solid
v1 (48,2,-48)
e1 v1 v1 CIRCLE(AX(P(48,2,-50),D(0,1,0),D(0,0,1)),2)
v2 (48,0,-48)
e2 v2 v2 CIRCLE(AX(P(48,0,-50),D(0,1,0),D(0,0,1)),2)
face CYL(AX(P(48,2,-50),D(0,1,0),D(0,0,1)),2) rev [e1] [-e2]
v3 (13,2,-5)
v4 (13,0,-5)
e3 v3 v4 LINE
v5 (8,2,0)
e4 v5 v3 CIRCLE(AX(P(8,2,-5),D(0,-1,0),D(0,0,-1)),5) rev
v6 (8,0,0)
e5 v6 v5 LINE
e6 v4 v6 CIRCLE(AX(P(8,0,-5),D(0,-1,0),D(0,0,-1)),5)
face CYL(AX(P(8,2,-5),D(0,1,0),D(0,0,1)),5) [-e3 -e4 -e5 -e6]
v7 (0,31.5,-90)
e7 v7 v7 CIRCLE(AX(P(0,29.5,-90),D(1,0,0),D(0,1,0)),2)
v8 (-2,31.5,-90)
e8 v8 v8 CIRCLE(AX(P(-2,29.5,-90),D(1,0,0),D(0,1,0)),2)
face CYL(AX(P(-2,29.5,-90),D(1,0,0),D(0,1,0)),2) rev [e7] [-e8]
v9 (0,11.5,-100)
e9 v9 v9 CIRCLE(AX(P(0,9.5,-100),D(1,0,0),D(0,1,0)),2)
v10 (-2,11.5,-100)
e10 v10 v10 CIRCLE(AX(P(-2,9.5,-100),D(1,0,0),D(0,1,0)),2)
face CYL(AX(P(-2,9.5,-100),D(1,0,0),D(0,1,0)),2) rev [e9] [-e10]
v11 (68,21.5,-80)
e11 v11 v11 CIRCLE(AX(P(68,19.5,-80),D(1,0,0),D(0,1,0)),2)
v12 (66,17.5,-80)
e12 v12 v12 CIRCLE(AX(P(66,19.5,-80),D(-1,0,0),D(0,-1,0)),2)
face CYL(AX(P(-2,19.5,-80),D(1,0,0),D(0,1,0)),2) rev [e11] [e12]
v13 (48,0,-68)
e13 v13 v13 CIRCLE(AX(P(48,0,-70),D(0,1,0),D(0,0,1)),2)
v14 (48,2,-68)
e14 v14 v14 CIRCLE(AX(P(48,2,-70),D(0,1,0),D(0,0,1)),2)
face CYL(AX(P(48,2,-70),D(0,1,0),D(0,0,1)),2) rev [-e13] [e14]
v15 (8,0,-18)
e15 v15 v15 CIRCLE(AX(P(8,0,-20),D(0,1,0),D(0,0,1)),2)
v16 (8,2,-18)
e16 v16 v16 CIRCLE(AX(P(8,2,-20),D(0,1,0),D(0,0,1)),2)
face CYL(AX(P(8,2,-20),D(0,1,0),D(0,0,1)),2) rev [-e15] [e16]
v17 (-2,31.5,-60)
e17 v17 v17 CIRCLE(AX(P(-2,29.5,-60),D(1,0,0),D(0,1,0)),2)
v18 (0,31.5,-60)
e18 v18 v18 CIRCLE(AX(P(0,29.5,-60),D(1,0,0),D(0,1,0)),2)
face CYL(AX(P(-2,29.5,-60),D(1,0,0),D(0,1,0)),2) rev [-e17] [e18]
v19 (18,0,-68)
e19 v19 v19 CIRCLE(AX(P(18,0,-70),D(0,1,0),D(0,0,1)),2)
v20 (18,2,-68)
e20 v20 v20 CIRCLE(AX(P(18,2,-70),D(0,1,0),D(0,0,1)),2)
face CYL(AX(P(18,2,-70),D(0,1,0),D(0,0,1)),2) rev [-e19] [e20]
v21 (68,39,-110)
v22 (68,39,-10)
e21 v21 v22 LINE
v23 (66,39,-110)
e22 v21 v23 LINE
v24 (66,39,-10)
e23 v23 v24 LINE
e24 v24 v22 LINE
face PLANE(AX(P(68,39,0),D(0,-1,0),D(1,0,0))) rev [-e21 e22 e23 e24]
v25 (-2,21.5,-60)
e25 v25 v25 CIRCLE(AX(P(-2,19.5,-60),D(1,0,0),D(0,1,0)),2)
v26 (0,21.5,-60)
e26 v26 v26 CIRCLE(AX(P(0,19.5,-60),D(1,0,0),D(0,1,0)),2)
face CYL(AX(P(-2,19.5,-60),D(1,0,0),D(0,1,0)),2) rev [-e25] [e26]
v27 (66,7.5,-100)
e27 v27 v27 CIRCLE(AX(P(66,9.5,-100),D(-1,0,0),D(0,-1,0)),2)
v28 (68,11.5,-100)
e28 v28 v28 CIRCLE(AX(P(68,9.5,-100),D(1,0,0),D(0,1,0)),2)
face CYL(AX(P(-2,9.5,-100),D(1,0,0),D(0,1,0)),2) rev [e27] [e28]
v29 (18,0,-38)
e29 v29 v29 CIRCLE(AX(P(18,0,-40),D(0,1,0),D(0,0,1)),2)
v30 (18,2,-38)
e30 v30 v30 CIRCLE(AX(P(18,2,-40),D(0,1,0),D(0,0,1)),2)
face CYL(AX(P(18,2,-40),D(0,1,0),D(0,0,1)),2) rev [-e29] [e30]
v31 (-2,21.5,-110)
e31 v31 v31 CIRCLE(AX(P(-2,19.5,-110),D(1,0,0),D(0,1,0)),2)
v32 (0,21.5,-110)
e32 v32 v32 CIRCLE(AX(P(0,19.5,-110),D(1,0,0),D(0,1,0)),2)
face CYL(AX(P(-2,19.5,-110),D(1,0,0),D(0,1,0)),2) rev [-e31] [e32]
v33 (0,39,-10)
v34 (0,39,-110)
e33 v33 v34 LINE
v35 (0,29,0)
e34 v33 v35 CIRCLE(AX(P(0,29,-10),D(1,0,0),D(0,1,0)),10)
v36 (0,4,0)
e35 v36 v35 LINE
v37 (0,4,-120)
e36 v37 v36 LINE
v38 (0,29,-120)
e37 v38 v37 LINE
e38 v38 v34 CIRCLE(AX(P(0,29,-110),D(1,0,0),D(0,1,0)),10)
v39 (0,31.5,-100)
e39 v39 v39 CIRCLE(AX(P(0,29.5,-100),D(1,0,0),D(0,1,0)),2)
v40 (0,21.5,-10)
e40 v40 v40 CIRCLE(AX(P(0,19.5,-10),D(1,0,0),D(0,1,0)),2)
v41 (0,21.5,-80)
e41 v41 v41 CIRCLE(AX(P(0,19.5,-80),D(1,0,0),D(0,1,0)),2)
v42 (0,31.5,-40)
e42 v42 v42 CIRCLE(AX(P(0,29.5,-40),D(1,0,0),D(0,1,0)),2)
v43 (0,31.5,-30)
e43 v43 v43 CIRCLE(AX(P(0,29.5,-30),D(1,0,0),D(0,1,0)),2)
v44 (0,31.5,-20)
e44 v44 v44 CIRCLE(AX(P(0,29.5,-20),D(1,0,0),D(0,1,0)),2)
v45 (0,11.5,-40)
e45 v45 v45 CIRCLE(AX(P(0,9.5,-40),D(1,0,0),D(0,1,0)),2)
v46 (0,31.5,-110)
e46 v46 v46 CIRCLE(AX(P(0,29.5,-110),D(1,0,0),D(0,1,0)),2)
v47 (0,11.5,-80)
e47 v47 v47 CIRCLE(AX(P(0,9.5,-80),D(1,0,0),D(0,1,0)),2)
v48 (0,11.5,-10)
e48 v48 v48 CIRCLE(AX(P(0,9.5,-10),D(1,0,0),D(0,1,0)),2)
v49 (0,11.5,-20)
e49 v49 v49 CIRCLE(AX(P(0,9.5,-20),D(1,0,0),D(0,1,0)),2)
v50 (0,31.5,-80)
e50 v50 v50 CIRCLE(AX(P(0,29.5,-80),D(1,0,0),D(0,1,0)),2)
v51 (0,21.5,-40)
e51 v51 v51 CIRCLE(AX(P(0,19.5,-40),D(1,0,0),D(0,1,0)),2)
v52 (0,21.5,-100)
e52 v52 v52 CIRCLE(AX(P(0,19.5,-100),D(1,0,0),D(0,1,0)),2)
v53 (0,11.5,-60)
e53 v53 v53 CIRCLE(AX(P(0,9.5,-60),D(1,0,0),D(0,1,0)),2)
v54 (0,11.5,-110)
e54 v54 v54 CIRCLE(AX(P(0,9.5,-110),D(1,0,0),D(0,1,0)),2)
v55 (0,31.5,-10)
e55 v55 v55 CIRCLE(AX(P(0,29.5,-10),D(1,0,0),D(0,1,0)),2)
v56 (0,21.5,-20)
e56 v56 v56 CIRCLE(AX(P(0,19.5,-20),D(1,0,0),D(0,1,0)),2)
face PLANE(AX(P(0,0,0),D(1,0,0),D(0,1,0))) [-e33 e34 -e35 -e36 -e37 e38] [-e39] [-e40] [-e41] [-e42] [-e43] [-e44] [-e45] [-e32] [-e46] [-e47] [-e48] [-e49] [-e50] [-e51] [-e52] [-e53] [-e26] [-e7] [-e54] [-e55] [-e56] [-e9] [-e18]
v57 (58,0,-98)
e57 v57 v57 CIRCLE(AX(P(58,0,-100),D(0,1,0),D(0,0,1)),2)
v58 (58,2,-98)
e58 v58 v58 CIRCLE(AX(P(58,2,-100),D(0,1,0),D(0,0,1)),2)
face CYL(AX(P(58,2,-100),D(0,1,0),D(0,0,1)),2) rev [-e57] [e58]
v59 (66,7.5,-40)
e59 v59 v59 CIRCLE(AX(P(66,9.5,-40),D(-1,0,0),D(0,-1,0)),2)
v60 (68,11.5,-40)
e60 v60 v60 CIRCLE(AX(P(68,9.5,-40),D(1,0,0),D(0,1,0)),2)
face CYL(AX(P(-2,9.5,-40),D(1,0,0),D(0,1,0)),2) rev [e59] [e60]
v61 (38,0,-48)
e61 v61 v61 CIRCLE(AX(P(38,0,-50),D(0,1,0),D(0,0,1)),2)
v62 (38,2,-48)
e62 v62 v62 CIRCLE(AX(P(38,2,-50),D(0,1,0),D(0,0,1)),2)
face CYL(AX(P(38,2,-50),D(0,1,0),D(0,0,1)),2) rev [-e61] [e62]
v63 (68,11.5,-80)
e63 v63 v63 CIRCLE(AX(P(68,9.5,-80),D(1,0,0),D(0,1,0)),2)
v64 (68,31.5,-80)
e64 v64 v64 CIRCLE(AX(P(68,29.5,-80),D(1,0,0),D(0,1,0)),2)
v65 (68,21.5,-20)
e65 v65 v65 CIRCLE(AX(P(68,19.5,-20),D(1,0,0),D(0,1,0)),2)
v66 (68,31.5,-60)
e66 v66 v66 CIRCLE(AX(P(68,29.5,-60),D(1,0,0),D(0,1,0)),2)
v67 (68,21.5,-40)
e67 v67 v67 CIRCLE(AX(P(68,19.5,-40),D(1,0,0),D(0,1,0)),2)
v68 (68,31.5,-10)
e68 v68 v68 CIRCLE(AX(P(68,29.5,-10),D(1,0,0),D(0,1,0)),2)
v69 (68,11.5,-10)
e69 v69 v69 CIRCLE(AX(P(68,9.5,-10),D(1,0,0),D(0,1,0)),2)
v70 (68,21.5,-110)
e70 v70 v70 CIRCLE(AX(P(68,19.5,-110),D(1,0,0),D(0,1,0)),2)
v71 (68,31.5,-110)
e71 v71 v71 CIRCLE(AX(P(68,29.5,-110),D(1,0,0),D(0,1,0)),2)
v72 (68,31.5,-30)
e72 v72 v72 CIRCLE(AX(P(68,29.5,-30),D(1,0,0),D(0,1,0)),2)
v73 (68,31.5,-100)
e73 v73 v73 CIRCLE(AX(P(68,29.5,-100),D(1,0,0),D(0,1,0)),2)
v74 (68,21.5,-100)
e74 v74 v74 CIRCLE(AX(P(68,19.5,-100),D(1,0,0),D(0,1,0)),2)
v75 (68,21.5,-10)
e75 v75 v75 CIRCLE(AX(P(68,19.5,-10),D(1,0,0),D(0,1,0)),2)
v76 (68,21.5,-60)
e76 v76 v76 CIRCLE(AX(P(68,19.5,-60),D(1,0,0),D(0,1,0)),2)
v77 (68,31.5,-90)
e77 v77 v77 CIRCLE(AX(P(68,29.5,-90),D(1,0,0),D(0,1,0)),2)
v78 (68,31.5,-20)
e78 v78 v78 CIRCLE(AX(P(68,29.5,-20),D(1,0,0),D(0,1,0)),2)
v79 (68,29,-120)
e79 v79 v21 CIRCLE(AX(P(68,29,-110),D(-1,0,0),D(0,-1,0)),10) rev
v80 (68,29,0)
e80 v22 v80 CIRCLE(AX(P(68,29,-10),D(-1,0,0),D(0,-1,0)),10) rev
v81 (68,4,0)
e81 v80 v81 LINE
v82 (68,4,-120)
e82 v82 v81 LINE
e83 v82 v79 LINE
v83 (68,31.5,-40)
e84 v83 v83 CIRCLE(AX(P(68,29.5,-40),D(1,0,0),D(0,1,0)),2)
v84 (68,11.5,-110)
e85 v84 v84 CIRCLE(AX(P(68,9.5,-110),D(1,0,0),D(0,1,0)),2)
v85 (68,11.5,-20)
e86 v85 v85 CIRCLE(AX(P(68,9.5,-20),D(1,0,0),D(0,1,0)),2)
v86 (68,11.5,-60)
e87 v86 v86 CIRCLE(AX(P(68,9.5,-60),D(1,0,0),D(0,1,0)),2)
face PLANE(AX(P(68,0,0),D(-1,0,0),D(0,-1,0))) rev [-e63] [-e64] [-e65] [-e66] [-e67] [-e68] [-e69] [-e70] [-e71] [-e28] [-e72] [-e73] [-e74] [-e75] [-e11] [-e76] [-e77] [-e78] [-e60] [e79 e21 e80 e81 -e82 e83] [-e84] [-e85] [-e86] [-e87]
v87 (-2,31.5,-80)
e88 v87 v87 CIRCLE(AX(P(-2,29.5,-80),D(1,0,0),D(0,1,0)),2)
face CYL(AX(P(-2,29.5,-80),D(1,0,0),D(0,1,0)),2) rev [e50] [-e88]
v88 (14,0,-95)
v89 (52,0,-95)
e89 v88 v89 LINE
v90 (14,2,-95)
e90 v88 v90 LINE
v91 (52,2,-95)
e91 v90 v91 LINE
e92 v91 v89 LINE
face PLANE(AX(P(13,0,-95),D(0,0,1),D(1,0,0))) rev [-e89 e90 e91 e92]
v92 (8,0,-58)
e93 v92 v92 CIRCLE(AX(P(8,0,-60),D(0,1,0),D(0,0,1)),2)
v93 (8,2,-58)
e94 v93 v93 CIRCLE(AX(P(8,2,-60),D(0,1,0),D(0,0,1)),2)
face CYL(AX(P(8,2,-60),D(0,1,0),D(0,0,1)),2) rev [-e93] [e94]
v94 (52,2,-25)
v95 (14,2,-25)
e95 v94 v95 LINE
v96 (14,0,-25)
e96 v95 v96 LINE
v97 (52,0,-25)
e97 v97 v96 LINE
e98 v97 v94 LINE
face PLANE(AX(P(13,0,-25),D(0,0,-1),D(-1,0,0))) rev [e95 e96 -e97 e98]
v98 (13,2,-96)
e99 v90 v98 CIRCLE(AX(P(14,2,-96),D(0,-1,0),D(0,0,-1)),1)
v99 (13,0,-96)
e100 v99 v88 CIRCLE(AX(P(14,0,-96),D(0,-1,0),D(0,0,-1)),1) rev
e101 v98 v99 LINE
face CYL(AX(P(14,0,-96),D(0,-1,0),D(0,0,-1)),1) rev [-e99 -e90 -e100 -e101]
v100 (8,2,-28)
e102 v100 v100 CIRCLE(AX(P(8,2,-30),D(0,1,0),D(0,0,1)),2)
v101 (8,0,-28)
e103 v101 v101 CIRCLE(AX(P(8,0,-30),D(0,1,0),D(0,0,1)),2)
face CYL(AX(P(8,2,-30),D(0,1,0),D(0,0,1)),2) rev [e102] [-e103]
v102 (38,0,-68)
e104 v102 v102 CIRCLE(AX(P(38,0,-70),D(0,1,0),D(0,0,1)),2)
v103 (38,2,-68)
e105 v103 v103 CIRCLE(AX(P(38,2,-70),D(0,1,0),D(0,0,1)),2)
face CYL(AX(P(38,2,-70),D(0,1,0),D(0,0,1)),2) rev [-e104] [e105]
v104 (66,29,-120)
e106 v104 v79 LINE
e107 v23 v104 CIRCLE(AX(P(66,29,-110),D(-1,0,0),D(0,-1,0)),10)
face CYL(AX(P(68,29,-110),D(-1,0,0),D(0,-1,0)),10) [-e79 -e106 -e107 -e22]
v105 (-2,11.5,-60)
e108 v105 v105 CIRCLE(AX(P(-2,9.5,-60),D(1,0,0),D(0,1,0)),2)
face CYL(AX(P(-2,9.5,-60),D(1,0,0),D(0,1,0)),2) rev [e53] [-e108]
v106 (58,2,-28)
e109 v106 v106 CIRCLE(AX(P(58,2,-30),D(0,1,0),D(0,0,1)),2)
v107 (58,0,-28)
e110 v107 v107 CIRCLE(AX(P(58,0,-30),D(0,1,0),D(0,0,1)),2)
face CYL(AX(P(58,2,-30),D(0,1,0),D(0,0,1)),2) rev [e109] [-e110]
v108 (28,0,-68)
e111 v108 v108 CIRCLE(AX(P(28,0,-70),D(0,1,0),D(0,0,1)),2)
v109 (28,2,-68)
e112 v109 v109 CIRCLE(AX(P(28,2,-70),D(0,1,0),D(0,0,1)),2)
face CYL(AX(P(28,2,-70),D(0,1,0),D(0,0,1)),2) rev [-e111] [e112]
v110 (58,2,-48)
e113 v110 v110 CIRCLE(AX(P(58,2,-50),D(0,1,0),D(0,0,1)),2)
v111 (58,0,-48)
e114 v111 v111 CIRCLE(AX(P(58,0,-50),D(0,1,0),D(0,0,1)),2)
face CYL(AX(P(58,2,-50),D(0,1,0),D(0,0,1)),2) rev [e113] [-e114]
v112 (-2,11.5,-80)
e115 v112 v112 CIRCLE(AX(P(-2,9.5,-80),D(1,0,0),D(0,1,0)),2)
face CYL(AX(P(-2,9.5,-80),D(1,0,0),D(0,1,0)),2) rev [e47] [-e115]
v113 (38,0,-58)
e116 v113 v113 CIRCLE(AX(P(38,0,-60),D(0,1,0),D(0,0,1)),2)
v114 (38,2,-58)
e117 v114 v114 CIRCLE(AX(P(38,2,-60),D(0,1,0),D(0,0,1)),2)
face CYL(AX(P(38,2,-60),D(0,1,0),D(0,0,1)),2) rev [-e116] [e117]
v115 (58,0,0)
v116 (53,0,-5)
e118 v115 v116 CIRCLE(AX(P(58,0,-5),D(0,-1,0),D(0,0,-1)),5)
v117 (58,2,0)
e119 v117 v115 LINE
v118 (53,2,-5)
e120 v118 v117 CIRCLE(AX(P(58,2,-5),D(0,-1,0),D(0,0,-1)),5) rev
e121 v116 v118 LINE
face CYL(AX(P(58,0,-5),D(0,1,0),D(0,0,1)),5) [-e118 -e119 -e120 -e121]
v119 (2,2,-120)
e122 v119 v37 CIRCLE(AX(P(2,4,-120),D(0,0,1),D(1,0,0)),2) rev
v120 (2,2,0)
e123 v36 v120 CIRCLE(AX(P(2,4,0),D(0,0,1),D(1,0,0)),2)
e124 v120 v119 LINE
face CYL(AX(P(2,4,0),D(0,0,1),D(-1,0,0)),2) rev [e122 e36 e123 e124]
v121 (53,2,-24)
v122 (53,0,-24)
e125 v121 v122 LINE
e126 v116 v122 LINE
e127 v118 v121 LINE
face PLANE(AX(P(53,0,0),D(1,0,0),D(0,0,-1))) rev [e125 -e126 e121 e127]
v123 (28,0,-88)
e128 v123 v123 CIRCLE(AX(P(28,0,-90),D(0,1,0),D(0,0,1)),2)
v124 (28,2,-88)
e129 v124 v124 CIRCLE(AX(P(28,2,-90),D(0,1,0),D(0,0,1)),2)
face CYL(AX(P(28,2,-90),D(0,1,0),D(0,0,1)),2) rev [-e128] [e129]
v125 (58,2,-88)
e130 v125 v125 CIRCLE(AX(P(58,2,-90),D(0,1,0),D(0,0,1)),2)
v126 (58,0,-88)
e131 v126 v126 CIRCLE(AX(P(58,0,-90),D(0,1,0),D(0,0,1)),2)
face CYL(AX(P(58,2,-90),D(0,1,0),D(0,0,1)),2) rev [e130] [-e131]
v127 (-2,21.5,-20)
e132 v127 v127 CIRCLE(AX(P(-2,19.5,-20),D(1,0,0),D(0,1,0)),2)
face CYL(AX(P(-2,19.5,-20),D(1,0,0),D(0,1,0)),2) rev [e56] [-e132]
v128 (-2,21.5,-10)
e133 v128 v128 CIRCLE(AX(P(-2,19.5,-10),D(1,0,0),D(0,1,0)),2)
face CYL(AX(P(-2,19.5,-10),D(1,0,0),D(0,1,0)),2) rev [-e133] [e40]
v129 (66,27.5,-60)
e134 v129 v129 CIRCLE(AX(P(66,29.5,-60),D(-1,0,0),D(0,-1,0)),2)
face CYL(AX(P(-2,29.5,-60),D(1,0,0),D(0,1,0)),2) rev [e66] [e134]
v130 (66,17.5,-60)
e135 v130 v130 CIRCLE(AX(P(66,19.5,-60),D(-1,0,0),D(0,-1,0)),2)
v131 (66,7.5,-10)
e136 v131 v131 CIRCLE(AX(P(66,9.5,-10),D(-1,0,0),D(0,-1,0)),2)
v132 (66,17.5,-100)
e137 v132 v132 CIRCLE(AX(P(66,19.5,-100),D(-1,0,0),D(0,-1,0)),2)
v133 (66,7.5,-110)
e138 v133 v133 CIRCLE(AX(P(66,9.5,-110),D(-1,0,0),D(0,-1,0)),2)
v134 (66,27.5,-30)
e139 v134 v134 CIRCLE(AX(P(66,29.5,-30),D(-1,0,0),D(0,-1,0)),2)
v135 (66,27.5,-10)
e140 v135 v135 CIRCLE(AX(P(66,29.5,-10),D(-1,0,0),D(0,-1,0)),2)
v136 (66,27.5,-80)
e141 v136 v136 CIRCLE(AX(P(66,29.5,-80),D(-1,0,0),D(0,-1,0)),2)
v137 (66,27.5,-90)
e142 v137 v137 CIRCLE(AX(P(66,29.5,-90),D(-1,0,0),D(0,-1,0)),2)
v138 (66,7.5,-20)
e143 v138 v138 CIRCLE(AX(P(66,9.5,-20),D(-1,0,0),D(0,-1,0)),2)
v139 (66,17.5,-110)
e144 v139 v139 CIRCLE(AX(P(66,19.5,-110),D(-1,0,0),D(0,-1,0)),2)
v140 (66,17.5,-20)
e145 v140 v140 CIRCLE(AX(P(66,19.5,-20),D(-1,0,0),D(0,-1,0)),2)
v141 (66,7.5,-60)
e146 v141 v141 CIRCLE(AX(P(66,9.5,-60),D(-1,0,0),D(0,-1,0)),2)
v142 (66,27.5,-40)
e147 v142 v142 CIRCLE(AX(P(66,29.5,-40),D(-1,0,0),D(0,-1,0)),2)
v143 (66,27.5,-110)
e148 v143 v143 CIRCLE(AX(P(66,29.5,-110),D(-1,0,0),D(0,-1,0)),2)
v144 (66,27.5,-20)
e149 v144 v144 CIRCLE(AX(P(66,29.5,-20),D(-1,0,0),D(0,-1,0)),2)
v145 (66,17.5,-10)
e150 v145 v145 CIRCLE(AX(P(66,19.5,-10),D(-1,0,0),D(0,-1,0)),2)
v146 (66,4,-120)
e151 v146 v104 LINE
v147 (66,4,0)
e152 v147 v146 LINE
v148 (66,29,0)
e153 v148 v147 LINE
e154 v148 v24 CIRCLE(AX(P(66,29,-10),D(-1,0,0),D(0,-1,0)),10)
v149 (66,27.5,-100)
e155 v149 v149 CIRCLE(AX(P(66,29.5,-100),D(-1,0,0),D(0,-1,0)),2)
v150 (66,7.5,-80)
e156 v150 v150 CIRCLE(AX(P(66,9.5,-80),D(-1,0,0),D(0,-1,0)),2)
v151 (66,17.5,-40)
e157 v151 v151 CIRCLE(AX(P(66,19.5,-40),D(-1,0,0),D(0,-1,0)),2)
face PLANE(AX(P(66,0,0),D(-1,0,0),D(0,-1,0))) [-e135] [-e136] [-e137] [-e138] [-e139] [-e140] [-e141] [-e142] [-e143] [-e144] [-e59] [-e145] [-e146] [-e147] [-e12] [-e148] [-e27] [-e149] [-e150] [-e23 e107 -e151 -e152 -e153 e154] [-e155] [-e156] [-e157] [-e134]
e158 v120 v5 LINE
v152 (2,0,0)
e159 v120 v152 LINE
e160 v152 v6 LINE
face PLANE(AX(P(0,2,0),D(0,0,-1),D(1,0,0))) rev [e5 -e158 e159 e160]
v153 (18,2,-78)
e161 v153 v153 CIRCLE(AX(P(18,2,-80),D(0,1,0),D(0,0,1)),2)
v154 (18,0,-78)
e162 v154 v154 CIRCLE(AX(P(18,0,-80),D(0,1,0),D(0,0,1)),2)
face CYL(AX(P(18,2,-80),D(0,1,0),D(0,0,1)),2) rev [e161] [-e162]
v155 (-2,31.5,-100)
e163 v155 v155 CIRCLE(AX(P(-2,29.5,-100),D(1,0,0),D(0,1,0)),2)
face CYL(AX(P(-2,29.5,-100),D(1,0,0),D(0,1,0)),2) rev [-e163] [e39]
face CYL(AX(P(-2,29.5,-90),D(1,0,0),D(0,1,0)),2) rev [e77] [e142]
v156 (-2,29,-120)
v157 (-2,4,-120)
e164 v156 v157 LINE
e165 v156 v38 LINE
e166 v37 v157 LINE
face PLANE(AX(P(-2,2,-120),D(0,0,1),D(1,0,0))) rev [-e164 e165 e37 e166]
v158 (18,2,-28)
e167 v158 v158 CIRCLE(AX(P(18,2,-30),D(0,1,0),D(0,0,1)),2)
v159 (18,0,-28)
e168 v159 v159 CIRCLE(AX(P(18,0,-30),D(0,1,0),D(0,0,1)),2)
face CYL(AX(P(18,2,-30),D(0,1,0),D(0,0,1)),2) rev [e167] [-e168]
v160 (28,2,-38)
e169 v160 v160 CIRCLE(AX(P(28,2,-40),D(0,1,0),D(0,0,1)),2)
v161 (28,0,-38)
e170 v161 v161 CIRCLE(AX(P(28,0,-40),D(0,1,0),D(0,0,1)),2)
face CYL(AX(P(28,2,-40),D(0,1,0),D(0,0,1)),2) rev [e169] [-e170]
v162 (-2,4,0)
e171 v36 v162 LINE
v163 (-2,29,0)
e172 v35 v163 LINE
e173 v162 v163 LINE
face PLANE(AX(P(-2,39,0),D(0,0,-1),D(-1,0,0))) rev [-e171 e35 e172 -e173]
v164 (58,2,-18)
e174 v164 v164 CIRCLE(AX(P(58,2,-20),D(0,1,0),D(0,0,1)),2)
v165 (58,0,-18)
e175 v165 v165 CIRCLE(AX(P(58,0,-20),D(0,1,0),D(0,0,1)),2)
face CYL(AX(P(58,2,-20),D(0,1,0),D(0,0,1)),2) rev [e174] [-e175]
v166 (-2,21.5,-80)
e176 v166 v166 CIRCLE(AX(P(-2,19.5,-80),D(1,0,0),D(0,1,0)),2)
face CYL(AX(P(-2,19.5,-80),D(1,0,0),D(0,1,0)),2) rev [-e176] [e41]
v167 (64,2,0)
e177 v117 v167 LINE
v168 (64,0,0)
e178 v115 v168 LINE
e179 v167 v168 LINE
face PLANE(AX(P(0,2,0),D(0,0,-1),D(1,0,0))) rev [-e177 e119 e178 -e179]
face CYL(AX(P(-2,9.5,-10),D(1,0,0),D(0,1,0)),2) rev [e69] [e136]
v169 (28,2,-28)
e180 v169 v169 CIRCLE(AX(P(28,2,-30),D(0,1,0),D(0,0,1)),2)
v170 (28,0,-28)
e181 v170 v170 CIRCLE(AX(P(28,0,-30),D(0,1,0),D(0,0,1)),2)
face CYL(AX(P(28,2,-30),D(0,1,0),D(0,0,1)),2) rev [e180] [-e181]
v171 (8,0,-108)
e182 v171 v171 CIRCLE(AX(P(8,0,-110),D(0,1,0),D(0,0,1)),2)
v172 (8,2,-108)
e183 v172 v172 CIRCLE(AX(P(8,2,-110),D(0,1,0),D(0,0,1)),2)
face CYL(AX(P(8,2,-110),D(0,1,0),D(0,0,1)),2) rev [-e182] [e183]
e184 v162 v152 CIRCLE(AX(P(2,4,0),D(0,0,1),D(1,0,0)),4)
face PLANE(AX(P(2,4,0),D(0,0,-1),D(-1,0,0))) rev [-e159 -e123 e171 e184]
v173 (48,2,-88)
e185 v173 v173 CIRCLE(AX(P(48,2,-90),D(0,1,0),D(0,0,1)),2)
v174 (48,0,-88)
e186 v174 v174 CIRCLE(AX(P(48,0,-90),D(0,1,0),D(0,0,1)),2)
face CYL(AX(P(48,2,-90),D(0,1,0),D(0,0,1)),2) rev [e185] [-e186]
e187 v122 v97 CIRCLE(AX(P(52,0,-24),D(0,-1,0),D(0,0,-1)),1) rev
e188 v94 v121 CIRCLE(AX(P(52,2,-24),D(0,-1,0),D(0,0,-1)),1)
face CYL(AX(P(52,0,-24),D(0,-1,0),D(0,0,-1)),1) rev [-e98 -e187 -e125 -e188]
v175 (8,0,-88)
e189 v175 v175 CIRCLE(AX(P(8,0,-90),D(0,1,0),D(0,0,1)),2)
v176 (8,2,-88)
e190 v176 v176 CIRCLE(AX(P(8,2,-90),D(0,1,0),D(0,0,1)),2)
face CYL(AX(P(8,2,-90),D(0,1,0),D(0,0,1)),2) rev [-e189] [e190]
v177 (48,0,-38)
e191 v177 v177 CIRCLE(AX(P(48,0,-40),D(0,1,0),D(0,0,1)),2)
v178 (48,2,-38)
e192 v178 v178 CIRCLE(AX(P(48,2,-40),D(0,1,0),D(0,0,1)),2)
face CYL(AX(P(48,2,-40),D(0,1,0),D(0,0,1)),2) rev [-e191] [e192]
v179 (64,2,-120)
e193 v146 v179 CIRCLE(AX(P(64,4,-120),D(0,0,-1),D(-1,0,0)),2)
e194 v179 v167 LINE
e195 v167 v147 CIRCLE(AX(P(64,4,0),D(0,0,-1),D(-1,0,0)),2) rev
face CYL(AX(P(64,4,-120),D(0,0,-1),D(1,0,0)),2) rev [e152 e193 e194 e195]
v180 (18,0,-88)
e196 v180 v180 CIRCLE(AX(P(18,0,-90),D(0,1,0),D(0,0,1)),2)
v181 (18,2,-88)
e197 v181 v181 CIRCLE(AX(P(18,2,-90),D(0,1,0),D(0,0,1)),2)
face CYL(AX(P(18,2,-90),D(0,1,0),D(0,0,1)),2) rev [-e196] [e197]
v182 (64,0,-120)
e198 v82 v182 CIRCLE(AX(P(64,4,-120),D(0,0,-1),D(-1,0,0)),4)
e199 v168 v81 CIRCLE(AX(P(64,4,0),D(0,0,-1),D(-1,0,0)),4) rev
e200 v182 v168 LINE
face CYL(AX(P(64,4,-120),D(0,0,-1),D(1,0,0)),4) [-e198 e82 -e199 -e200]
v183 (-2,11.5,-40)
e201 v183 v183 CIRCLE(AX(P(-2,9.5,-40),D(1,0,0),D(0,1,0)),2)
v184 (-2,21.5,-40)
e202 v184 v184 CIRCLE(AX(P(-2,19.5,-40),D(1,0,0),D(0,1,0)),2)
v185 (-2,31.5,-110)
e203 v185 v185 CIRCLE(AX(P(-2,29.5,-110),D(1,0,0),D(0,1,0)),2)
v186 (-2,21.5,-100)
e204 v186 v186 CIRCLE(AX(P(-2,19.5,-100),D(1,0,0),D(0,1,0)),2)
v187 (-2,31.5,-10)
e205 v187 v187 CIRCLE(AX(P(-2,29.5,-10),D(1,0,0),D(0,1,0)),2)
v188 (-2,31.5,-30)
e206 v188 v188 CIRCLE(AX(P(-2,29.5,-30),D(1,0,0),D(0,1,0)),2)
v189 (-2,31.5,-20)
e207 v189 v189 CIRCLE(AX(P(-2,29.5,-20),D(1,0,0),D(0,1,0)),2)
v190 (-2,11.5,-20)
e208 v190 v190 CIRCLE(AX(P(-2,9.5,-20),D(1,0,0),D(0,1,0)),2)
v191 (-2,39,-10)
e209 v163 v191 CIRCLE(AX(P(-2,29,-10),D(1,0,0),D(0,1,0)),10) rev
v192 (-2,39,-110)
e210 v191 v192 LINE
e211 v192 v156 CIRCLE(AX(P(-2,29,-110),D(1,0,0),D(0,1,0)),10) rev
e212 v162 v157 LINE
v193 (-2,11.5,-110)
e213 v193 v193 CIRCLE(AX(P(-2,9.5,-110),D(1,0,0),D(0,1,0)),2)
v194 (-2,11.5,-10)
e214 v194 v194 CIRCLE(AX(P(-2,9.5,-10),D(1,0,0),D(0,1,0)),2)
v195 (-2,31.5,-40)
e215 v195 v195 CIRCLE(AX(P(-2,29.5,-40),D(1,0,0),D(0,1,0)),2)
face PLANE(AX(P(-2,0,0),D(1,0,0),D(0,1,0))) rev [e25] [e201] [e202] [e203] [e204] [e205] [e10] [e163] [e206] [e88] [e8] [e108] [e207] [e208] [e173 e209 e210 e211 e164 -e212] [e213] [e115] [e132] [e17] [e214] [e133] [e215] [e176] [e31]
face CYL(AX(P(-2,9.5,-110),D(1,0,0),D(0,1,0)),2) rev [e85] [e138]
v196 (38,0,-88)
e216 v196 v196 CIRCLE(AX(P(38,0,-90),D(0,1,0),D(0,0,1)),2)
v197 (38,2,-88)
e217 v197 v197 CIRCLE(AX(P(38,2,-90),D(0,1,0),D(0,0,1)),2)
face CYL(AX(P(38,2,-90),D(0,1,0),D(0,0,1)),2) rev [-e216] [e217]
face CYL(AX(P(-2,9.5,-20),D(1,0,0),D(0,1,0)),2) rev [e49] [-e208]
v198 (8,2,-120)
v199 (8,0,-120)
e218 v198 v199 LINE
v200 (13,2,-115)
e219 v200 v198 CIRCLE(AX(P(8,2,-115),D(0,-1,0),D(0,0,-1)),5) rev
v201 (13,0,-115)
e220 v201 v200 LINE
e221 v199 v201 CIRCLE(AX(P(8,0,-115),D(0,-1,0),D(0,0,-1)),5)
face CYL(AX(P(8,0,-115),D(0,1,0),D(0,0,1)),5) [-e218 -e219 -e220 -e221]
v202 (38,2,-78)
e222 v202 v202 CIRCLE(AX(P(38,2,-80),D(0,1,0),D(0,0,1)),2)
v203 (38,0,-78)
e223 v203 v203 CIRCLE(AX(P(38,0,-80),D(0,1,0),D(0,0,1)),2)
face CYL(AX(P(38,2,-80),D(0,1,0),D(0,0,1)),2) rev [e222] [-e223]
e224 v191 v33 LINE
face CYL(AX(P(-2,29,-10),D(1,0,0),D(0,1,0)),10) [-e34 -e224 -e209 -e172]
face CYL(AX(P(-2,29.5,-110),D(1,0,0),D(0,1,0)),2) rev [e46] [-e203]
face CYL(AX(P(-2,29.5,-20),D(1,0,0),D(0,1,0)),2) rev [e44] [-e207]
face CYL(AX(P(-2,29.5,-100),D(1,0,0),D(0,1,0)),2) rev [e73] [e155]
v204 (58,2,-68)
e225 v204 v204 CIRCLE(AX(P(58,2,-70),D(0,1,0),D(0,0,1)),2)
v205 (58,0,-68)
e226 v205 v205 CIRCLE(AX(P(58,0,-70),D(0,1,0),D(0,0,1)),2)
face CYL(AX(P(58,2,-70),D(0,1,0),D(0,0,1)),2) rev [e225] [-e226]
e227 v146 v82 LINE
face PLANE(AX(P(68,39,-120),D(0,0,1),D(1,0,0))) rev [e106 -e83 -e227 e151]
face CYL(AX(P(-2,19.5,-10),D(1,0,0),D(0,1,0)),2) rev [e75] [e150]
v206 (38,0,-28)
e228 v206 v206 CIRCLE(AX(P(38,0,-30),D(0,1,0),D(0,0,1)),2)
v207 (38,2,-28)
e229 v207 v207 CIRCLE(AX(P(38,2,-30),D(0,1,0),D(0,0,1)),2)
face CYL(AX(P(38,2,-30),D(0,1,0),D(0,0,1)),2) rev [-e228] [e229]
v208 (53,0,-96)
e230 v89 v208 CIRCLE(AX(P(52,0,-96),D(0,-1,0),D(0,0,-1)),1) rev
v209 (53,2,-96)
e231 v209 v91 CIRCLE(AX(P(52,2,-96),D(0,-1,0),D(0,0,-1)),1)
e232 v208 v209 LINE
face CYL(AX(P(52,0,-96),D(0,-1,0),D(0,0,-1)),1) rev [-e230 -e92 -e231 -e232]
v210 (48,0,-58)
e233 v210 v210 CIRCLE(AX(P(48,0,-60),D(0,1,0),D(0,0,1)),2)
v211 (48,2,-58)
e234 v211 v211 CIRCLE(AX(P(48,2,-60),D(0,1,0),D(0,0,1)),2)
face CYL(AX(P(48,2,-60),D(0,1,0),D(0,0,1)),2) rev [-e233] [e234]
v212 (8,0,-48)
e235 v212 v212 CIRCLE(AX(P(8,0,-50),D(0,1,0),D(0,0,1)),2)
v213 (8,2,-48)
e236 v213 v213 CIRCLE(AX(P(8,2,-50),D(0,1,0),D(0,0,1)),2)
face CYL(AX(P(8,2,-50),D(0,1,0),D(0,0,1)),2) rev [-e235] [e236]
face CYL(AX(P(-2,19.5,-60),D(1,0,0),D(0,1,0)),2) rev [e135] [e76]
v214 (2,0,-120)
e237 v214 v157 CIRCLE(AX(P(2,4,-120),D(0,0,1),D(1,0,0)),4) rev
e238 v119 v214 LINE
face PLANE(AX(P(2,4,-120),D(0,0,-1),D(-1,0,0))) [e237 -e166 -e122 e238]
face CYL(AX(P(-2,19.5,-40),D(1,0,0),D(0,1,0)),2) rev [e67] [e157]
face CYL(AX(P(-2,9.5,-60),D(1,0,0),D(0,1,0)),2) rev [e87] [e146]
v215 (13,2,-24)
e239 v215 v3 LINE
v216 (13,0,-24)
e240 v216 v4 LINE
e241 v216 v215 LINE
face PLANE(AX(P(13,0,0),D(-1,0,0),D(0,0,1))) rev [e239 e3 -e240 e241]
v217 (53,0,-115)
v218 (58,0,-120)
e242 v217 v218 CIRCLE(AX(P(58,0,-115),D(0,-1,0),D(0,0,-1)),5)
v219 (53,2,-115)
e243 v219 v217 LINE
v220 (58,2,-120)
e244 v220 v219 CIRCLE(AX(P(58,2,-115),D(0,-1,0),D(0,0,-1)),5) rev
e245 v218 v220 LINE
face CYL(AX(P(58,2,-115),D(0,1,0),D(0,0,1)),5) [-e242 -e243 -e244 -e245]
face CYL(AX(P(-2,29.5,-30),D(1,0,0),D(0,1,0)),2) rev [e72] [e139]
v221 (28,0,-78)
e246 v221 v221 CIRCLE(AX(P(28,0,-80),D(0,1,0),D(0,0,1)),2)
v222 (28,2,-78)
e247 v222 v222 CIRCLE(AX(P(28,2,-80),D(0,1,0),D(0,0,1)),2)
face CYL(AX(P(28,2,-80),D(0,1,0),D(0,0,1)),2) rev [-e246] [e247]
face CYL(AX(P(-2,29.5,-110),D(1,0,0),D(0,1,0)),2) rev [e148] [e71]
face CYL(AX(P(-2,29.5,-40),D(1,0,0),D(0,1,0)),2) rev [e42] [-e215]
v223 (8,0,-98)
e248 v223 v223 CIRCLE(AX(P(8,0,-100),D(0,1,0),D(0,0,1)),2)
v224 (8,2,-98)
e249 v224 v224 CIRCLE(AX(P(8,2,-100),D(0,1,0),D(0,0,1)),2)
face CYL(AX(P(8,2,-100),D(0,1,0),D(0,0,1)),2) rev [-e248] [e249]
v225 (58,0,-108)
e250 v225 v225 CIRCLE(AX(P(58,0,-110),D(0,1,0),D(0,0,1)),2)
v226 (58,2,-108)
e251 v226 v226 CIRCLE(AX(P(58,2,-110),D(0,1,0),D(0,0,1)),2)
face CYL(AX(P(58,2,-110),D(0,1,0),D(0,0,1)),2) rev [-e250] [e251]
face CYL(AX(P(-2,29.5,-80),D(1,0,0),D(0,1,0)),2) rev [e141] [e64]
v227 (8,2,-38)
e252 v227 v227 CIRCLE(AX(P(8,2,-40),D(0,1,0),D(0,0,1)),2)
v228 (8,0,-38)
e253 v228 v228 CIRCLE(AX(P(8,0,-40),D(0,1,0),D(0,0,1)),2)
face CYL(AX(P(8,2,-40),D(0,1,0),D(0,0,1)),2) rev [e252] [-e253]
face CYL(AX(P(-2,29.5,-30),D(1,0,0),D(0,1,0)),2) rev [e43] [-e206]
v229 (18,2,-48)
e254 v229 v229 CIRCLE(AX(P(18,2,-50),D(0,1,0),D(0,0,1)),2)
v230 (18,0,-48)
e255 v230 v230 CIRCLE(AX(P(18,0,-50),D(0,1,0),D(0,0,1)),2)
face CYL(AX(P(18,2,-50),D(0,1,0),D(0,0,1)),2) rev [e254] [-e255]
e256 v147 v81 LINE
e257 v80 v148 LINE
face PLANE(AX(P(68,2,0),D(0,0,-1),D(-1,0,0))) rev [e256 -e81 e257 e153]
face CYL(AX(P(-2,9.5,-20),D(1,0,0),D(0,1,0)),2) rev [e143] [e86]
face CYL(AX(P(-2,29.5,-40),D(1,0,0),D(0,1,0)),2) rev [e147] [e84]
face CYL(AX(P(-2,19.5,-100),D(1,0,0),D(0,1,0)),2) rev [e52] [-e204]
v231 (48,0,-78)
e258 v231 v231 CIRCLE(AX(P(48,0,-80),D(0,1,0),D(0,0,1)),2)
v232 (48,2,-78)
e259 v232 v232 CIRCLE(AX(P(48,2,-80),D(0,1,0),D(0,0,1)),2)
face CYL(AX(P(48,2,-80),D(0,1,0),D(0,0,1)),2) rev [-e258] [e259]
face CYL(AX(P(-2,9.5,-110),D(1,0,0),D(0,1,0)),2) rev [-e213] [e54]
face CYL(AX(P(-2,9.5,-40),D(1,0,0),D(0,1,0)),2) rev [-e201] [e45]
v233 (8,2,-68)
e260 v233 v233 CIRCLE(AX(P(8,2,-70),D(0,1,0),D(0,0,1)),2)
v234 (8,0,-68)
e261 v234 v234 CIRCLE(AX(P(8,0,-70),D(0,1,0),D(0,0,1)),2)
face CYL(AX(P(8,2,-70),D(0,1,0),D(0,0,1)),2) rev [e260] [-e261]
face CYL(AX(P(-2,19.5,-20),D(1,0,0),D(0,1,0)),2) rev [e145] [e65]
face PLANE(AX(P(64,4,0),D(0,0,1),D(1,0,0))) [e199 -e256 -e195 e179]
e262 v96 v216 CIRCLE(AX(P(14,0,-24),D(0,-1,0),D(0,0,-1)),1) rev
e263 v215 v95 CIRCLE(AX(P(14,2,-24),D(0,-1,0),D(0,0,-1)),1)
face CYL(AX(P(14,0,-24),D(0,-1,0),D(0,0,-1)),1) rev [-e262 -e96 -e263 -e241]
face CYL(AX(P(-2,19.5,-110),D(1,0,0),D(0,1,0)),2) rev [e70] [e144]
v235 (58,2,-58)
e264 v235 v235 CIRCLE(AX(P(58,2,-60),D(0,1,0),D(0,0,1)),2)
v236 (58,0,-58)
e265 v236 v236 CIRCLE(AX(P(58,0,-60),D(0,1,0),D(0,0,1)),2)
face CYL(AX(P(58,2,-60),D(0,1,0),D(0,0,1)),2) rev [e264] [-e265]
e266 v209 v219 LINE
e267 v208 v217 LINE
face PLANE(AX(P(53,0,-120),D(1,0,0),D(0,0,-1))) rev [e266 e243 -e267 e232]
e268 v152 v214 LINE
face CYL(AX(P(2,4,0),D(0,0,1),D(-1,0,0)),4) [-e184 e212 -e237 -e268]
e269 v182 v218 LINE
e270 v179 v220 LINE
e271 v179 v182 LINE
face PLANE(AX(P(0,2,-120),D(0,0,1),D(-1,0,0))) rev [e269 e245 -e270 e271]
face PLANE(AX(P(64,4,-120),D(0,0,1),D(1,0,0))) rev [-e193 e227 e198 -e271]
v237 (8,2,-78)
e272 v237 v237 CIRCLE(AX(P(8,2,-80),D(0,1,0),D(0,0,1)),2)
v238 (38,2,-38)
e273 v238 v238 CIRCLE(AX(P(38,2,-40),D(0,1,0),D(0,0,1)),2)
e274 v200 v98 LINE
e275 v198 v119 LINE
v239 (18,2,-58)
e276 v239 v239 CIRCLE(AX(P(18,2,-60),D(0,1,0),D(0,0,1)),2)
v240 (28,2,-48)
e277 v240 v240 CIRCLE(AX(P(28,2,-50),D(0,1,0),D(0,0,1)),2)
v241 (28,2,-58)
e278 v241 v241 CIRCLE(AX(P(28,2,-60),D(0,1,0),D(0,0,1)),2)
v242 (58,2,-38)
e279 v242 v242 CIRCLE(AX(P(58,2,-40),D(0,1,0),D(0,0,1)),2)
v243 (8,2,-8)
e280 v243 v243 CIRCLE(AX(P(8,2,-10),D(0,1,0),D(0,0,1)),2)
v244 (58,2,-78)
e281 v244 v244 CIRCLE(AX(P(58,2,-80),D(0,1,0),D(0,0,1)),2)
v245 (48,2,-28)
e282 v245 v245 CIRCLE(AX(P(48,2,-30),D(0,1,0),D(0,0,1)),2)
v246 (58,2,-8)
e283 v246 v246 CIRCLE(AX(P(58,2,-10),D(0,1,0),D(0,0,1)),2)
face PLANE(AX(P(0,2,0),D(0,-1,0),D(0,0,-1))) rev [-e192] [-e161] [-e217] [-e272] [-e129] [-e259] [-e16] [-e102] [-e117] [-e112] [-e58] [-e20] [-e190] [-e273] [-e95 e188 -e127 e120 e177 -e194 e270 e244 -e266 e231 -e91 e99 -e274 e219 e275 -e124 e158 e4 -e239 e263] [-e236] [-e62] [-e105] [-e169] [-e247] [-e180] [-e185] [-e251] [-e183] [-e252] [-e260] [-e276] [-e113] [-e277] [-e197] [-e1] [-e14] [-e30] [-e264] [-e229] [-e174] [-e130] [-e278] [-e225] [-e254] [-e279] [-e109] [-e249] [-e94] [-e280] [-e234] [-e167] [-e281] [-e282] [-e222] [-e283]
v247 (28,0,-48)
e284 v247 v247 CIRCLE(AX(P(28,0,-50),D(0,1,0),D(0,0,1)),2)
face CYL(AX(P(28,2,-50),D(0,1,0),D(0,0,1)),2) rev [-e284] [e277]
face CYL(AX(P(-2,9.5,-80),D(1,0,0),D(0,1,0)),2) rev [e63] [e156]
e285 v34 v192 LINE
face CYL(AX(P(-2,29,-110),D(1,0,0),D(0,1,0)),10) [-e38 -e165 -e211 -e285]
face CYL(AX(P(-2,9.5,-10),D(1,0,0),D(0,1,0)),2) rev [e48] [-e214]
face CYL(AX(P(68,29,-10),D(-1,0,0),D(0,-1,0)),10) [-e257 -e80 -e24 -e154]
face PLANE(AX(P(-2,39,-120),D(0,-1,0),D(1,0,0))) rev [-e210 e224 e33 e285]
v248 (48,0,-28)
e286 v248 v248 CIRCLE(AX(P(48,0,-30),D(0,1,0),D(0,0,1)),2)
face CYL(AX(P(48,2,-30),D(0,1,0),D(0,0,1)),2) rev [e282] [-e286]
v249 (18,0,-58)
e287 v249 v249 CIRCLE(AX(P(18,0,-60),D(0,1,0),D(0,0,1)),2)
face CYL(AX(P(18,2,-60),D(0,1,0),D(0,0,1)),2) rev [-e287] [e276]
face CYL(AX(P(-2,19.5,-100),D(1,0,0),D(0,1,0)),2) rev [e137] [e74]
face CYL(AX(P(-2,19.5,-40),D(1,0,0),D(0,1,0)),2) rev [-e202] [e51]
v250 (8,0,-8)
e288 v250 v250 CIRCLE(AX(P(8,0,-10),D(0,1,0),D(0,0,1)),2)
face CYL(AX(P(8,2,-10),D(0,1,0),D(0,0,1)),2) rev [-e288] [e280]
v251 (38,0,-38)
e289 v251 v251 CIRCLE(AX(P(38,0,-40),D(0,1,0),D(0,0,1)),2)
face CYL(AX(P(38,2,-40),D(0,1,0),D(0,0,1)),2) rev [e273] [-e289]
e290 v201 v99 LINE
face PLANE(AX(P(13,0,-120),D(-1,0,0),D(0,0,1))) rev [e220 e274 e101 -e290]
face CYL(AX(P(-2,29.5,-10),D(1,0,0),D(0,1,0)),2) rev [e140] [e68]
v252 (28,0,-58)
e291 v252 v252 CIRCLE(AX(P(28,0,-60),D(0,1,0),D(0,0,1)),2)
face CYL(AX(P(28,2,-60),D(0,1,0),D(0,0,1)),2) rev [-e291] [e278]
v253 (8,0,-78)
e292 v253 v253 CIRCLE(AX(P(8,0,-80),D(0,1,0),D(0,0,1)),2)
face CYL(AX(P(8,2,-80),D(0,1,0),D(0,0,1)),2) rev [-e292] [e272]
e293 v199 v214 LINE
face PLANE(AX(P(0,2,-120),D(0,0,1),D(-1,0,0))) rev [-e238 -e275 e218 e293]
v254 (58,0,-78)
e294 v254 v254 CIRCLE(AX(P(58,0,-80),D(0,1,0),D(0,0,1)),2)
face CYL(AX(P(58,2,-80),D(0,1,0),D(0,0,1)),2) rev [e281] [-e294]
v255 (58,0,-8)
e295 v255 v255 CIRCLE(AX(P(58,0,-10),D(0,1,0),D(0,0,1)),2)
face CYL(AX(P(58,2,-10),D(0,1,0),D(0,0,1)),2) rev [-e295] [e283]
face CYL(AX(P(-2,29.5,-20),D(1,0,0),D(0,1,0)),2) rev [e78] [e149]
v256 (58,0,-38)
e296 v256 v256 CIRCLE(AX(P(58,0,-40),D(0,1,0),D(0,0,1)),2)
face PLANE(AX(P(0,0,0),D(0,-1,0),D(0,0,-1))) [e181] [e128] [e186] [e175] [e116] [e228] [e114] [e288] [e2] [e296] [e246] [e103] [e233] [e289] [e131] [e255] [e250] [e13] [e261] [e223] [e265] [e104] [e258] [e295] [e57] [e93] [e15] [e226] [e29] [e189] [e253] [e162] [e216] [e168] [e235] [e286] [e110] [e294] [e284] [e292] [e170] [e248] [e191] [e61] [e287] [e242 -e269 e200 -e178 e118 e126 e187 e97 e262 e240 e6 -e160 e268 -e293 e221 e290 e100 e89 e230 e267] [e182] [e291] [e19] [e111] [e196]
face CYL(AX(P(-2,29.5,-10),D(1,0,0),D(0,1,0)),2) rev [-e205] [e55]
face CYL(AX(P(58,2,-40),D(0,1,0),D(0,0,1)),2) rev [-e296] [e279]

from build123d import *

# Parameters (mm, degrees)
SKETCH1_W                      = 66
SKETCH1_H                      = 120
BOSS_EXTRUDE1_DEPTH            = 2
SKETCH2_R                      = 2
CUT_EXTRUDE1_DEPTH             = 137.967149346
EDGE_FLANGE1_STRIP_W           = 12
EDGE_FLANGE1_STRIP_H           = 2
EDGE_FLANGE1_STRIP_CUT_DEPTH   = 120
EDGE_FLANGE1_STRIP_2_W         = 12
EDGE_FLANGE1_STRIP_2_H         = 2
EDGE_FLANGE1_STRIP_CUT_2_DEPTH = 120
EDGE_FLANGE1_DEPTH             = 120
EDGE_FLANGE1_BEND_DEPTH        = 120
SKETCH24_W                     = 40
SKETCH24_H                     = 25
CUT_EXTRUDE6_DEPTH             = 143.804061567
FILLET1_R                      = 10
FILLET2_R                      = 5
FILLET3_R                      = 1
SKETCH25_R                     = 2
CUT_EXTRUDE8_DEPTH             = 145.294837052


# Sheet-metal steps are written as plain solids
with BuildPart() as part:
    # Sketch1 → Boss-Extrude1 (new body)
    with BuildSketch(Plane(origin=(0, 0, 0), x_dir=(1, 0, 0), z_dir=(0, 1, 0))):
        with Locations((33, 60)):
            Rectangle(SKETCH1_W, SKETCH1_H)
    extrude(amount=BOSS_EXTRUDE1_DEPTH)

    # Sketch2 → Cut-Extrude1 (cut, through all)
    with BuildSketch(Plane(origin=(0, 2, 0), x_dir=(1, 0, 0), z_dir=(0, 1, 0))):
        with Locations(Location((8, 110, 0), (0, 0, 270))):
            Circle(SKETCH2_R)
        with Locations(Location((18, 110, 0), (0, 0, 270))):
            Circle(SKETCH2_R)
        with Locations(Location((28, 110, 0), (0, 0, 270))):
            Circle(SKETCH2_R)
        with Locations(Location((38, 110, 0), (0, 0, 270))):
            Circle(SKETCH2_R)
        with Locations(Location((48, 110, 0), (0, 0, 270))):
            Circle(SKETCH2_R)
        with Locations(Location((58, 110, 0), (0, 0, 270))):
            Circle(SKETCH2_R)
        with Locations(Location((18, 100, 0), (0, 0, 270))):
            Circle(SKETCH2_R)
        with Locations(Location((28, 100, 0), (0, 0, 270))):
            Circle(SKETCH2_R)
        with Locations(Location((38, 100, 0), (0, 0, 270))):
            Circle(SKETCH2_R)
        with Locations(Location((48, 100, 0), (0, 0, 270))):
            Circle(SKETCH2_R)
        with Locations(Location((58, 100, 0), (0, 0, 270))):
            Circle(SKETCH2_R)
        with Locations(Location((18, 90, 0), (0, 0, 270))):
            Circle(SKETCH2_R)
        with Locations(Location((28, 90, 0), (0, 0, 270))):
            Circle(SKETCH2_R)
        with Locations(Location((38, 90, 0), (0, 0, 270))):
            Circle(SKETCH2_R)
        with Locations(Location((48, 90, 0), (0, 0, 270))):
            Circle(SKETCH2_R)
        with Locations(Location((58, 90, 0), (0, 0, 270))):
            Circle(SKETCH2_R)
        with Locations(Location((18, 80, 0), (0, 0, 270))):
            Circle(SKETCH2_R)
        with Locations(Location((28, 80, 0), (0, 0, 270))):
            Circle(SKETCH2_R)
        with Locations(Location((38, 80, 0), (0, 0, 270))):
            Circle(SKETCH2_R)
        with Locations(Location((48, 80, 0), (0, 0, 270))):
            Circle(SKETCH2_R)
        with Locations(Location((58, 80, 0), (0, 0, 270))):
            Circle(SKETCH2_R)
        with Locations(Location((18, 70, 0), (0, 0, 270))):
            Circle(SKETCH2_R)
        with Locations(Location((28, 70, 0), (0, 0, 270))):
            Circle(SKETCH2_R)
        with Locations(Location((38, 70, 0), (0, 0, 270))):
            Circle(SKETCH2_R)
        with Locations(Location((48, 70, 0), (0, 0, 270))):
            Circle(SKETCH2_R)
        with Locations(Location((58, 70, 0), (0, 0, 270))):
            Circle(SKETCH2_R)
        with Locations(Location((18, 60, 0), (0, 0, 270))):
            Circle(SKETCH2_R)
        with Locations(Location((28, 60, 0), (0, 0, 270))):
            Circle(SKETCH2_R)
        with Locations(Location((38, 60, 0), (0, 0, 270))):
            Circle(SKETCH2_R)
        with Locations(Location((48, 60, 0), (0, 0, 270))):
            Circle(SKETCH2_R)
        with Locations(Location((58, 60, 0), (0, 0, 270))):
            Circle(SKETCH2_R)
        with Locations(Location((18, 50, 0), (0, 0, 270))):
            Circle(SKETCH2_R)
        with Locations(Location((28, 50, 0), (0, 0, 270))):
            Circle(SKETCH2_R)
        with Locations(Location((38, 50, 0), (0, 0, 270))):
            Circle(SKETCH2_R)
        with Locations(Location((48, 50, 0), (0, 0, 270))):
            Circle(SKETCH2_R)
        with Locations(Location((58, 50, 0), (0, 0, 270))):
            Circle(SKETCH2_R)
        with Locations(Location((18, 40, 0), (0, 0, 270))):
            Circle(SKETCH2_R)
        with Locations(Location((28, 40, 0), (0, 0, 270))):
            Circle(SKETCH2_R)
        with Locations(Location((38, 40, 0), (0, 0, 270))):
            Circle(SKETCH2_R)
        with Locations(Location((48, 40, 0), (0, 0, 270))):
            Circle(SKETCH2_R)
        with Locations(Location((58, 40, 0), (0, 0, 270))):
            Circle(SKETCH2_R)
        with Locations(Location((18, 30, 0), (0, 0, 270))):
            Circle(SKETCH2_R)
        with Locations(Location((28, 30, 0), (0, 0, 270))):
            Circle(SKETCH2_R)
        with Locations(Location((38, 30, 0), (0, 0, 270))):
            Circle(SKETCH2_R)
        with Locations(Location((48, 30, 0), (0, 0, 270))):
            Circle(SKETCH2_R)
        with Locations(Location((58, 30, 0), (0, 0, 270))):
            Circle(SKETCH2_R)
        with Locations(Location((18, 20, 0), (0, 0, 270))):
            Circle(SKETCH2_R)
        with Locations(Location((28, 20, 0), (0, 0, 270))):
            Circle(SKETCH2_R)
        with Locations(Location((38, 20, 0), (0, 0, 270))):
            Circle(SKETCH2_R)
        with Locations(Location((48, 20, 0), (0, 0, 270))):
            Circle(SKETCH2_R)
        with Locations(Location((58, 20, 0), (0, 0, 270))):
            Circle(SKETCH2_R)
        with Locations(Location((18, 10, 0), (0, 0, 270))):
            Circle(SKETCH2_R)
        with Locations(Location((28, 10, 0), (0, 0, 270))):
            Circle(SKETCH2_R)
        with Locations(Location((38, 10, 0), (0, 0, 270))):
            Circle(SKETCH2_R)
        with Locations(Location((48, 10, 0), (0, 0, 270))):
            Circle(SKETCH2_R)
        with Locations(Location((58, 10, 0), (0, 0, 270))):
            Circle(SKETCH2_R)
        with Locations(Location((8, 100, 0), (0, 0, 270))):
            Circle(SKETCH2_R)
        with Locations(Location((8, 90, 0), (0, 0, 270))):
            Circle(SKETCH2_R)
        with Locations(Location((8, 80, 0), (0, 0, 270))):
            Circle(SKETCH2_R)
        with Locations(Location((8, 70, 0), (0, 0, 270))):
            Circle(SKETCH2_R)
        with Locations(Location((8, 60, 0), (0, 0, 270))):
            Circle(SKETCH2_R)
        with Locations(Location((8, 50, 0), (0, 0, 270))):
            Circle(SKETCH2_R)
        with Locations(Location((8, 40, 0), (0, 0, 270))):
            Circle(SKETCH2_R)
        with Locations(Location((8, 30, 0), (0, 0, 270))):
            Circle(SKETCH2_R)
        with Locations(Location((8, 20, 0), (0, 0, 270))):
            Circle(SKETCH2_R)
        with Locations(Location((8, 10, 0), (0, 0, 270))):
            Circle(SKETCH2_R)
    extrude(amount=-CUT_EXTRUDE1_DEPTH, mode=Mode.SUBTRACT)

    # Edge-Flange1 strip (across the edge) → Edge-Flange1 strip cut (cut)
    with BuildSketch(Plane(origin=(0, 2, -120), x_dir=(1, 0, 0), z_dir=(0, 0, 1))):
        with Locations((-4, -1)):
            Rectangle(EDGE_FLANGE1_STRIP_W, EDGE_FLANGE1_STRIP_H)
    extrude(amount=EDGE_FLANGE1_STRIP_CUT_DEPTH, mode=Mode.SUBTRACT)

    # Edge-Flange1 strip 2 (across the edge) → Edge-Flange1 strip cut 2 (cut)
    with BuildSketch(Plane(origin=(66, 2, 0), x_dir=(-1, 0, 0), z_dir=(0, 0, -1))):
        with Locations((-4, -1)):
            Rectangle(EDGE_FLANGE1_STRIP_2_W, EDGE_FLANGE1_STRIP_2_H)
    extrude(amount=EDGE_FLANGE1_STRIP_CUT_2_DEPTH, mode=Mode.SUBTRACT)

    # Edge-Flange1 section (across the edge) → Edge-Flange1 (add)
    with BuildSketch(Plane(origin=(0, 2, -120), x_dir=(1, 0, 0), z_dir=(0, 0, 1))):
        with BuildLine():
            Line((-2, 2), (-2, 37))
            Line((-2, 37), (0, 37))
            Line((0, 37), (0, 2))
            ThreePointArc((0, 2), (0.585786438, 0.585786438), (2, 0))
            Line((2, 0), (2, -2))
            ThreePointArc((2, -2), (-0.828427125, -0.828427125), (-2, 2))
        make_face()
    extrude(amount=EDGE_FLANGE1_DEPTH)

    # Edge-Flange1 section 2 (across the edge) → Edge-Flange1 bend (add)
    with BuildSketch(Plane(origin=(66, 2, 0), x_dir=(-1, 0, 0), z_dir=(0, 0, -1))):
        with BuildLine():
            Line((-2, 2), (-2, 37))
            Line((-2, 37), (0, 37))
            Line((0, 37), (0, 2))
            ThreePointArc((0, 2), (0.585786438, 0.585786438), (2, 0))
            Line((2, 0), (2, -2))
            ThreePointArc((2, -2), (-0.828427125, -0.828427125), (-2, 2))
        make_face()
    extrude(amount=EDGE_FLANGE1_BEND_DEPTH)

    # Sketch24 → Cut-Extrude6 (cut, through all)
    with BuildSketch(Plane(origin=(0, 2, 0), x_dir=(1, 0, 0), z_dir=(0, 1, 0))):
        with Locations((33, 107.5)):
            Rectangle(SKETCH24_W, SKETCH24_H)
        with Locations((33, 12.5)):
            Rectangle(SKETCH24_W, SKETCH24_H)
    extrude(amount=-CUT_EXTRUDE6_DEPTH, mode=Mode.SUBTRACT)

    # Fillet1
    fillet1_edges = [part.edges().sort_by_distance(p)[0] for p in [
        (-1, 39, -120),
        (-1, 39, 0),
        (67, 39, 0),
        (67, 39, -120),
    ]]
    fillet(fillet1_edges, radius=FILLET1_R)

    # Fillet2
    fillet2_edges = [part.edges().sort_by_distance(p)[0] for p in [
        (13, 1, -120),
        (53, 1, -120),
        (53, 1, 0),
        (13, 1, 0),
    ]]
    fillet(fillet2_edges, radius=FILLET2_R)

    # Fillet3
    fillet3_edges = [part.edges().sort_by_distance(p)[0] for p in [
        (13, 1, -95),
        (53, 1, -95),
        (13, 1, -25),
        (53, 1, -25),
    ]]
    fillet(fillet3_edges, radius=FILLET3_R)

    # Sketch25 → Cut-Extrude8 (cut, through all)
    with BuildSketch(Plane(origin=(68, 0, 0), x_dir=(0, 0, -1), z_dir=(1, 0, 0))):
        with Locations(Location((10, 29.5, 0), (0, 0, 90))):
            Circle(SKETCH25_R)
        with Locations(Location((20, 29.5, 0), (0, 0, 90))):
            Circle(SKETCH25_R)
        with Locations(Location((30, 29.5, 0), (0, 0, 90))):
            Circle(SKETCH25_R)
        with Locations(Location((40, 29.5, 0), (0, 0, 90))):
            Circle(SKETCH25_R)
        with Locations(Location((60, 29.5, 0), (0, 0, 90))):
            Circle(SKETCH25_R)
        with Locations(Location((80, 29.5, 0), (0, 0, 90))):
            Circle(SKETCH25_R)
        with Locations(Location((90, 29.5, 0), (0, 0, 90))):
            Circle(SKETCH25_R)
        with Locations(Location((100, 29.5, 0), (0, 0, 90))):
            Circle(SKETCH25_R)
        with Locations(Location((110, 29.5, 0), (0, 0, 90))):
            Circle(SKETCH25_R)
        with Locations(Location((20, 19.5, 0), (0, 0, 90))):
            Circle(SKETCH25_R)
        with Locations(Location((40, 19.5, 0), (0, 0, 90))):
            Circle(SKETCH25_R)
        with Locations(Location((60, 19.5, 0), (0, 0, 90))):
            Circle(SKETCH25_R)
        with Locations(Location((80, 19.5, 0), (0, 0, 90))):
            Circle(SKETCH25_R)
        with Locations(Location((100, 19.5, 0), (0, 0, 90))):
            Circle(SKETCH25_R)
        with Locations(Location((110, 19.5, 0), (0, 0, 90))):
            Circle(SKETCH25_R)
        with Locations(Location((20, 9.5, 0), (0, 0, 90))):
            Circle(SKETCH25_R)
        with Locations(Location((40, 9.5, 0), (0, 0, 90))):
            Circle(SKETCH25_R)
        with Locations(Location((60, 9.5, 0), (0, 0, 90))):
            Circle(SKETCH25_R)
        with Locations(Location((80, 9.5, 0), (0, 0, 90))):
            Circle(SKETCH25_R)
        with Locations(Location((100, 9.5, 0), (0, 0, 90))):
            Circle(SKETCH25_R)
        with Locations(Location((110, 9.5, 0), (0, 0, 90))):
            Circle(SKETCH25_R)
        with Locations(Location((10, 19.5, 0), (0, 0, 90))):
            Circle(SKETCH25_R)
        with Locations(Location((10, 9.5, 0), (0, 0, 90))):
            Circle(SKETCH25_R)
    extrude(amount=-CUT_EXTRUDE8_DEPTH, mode=Mode.SUBTRACT)


solid = part.part
